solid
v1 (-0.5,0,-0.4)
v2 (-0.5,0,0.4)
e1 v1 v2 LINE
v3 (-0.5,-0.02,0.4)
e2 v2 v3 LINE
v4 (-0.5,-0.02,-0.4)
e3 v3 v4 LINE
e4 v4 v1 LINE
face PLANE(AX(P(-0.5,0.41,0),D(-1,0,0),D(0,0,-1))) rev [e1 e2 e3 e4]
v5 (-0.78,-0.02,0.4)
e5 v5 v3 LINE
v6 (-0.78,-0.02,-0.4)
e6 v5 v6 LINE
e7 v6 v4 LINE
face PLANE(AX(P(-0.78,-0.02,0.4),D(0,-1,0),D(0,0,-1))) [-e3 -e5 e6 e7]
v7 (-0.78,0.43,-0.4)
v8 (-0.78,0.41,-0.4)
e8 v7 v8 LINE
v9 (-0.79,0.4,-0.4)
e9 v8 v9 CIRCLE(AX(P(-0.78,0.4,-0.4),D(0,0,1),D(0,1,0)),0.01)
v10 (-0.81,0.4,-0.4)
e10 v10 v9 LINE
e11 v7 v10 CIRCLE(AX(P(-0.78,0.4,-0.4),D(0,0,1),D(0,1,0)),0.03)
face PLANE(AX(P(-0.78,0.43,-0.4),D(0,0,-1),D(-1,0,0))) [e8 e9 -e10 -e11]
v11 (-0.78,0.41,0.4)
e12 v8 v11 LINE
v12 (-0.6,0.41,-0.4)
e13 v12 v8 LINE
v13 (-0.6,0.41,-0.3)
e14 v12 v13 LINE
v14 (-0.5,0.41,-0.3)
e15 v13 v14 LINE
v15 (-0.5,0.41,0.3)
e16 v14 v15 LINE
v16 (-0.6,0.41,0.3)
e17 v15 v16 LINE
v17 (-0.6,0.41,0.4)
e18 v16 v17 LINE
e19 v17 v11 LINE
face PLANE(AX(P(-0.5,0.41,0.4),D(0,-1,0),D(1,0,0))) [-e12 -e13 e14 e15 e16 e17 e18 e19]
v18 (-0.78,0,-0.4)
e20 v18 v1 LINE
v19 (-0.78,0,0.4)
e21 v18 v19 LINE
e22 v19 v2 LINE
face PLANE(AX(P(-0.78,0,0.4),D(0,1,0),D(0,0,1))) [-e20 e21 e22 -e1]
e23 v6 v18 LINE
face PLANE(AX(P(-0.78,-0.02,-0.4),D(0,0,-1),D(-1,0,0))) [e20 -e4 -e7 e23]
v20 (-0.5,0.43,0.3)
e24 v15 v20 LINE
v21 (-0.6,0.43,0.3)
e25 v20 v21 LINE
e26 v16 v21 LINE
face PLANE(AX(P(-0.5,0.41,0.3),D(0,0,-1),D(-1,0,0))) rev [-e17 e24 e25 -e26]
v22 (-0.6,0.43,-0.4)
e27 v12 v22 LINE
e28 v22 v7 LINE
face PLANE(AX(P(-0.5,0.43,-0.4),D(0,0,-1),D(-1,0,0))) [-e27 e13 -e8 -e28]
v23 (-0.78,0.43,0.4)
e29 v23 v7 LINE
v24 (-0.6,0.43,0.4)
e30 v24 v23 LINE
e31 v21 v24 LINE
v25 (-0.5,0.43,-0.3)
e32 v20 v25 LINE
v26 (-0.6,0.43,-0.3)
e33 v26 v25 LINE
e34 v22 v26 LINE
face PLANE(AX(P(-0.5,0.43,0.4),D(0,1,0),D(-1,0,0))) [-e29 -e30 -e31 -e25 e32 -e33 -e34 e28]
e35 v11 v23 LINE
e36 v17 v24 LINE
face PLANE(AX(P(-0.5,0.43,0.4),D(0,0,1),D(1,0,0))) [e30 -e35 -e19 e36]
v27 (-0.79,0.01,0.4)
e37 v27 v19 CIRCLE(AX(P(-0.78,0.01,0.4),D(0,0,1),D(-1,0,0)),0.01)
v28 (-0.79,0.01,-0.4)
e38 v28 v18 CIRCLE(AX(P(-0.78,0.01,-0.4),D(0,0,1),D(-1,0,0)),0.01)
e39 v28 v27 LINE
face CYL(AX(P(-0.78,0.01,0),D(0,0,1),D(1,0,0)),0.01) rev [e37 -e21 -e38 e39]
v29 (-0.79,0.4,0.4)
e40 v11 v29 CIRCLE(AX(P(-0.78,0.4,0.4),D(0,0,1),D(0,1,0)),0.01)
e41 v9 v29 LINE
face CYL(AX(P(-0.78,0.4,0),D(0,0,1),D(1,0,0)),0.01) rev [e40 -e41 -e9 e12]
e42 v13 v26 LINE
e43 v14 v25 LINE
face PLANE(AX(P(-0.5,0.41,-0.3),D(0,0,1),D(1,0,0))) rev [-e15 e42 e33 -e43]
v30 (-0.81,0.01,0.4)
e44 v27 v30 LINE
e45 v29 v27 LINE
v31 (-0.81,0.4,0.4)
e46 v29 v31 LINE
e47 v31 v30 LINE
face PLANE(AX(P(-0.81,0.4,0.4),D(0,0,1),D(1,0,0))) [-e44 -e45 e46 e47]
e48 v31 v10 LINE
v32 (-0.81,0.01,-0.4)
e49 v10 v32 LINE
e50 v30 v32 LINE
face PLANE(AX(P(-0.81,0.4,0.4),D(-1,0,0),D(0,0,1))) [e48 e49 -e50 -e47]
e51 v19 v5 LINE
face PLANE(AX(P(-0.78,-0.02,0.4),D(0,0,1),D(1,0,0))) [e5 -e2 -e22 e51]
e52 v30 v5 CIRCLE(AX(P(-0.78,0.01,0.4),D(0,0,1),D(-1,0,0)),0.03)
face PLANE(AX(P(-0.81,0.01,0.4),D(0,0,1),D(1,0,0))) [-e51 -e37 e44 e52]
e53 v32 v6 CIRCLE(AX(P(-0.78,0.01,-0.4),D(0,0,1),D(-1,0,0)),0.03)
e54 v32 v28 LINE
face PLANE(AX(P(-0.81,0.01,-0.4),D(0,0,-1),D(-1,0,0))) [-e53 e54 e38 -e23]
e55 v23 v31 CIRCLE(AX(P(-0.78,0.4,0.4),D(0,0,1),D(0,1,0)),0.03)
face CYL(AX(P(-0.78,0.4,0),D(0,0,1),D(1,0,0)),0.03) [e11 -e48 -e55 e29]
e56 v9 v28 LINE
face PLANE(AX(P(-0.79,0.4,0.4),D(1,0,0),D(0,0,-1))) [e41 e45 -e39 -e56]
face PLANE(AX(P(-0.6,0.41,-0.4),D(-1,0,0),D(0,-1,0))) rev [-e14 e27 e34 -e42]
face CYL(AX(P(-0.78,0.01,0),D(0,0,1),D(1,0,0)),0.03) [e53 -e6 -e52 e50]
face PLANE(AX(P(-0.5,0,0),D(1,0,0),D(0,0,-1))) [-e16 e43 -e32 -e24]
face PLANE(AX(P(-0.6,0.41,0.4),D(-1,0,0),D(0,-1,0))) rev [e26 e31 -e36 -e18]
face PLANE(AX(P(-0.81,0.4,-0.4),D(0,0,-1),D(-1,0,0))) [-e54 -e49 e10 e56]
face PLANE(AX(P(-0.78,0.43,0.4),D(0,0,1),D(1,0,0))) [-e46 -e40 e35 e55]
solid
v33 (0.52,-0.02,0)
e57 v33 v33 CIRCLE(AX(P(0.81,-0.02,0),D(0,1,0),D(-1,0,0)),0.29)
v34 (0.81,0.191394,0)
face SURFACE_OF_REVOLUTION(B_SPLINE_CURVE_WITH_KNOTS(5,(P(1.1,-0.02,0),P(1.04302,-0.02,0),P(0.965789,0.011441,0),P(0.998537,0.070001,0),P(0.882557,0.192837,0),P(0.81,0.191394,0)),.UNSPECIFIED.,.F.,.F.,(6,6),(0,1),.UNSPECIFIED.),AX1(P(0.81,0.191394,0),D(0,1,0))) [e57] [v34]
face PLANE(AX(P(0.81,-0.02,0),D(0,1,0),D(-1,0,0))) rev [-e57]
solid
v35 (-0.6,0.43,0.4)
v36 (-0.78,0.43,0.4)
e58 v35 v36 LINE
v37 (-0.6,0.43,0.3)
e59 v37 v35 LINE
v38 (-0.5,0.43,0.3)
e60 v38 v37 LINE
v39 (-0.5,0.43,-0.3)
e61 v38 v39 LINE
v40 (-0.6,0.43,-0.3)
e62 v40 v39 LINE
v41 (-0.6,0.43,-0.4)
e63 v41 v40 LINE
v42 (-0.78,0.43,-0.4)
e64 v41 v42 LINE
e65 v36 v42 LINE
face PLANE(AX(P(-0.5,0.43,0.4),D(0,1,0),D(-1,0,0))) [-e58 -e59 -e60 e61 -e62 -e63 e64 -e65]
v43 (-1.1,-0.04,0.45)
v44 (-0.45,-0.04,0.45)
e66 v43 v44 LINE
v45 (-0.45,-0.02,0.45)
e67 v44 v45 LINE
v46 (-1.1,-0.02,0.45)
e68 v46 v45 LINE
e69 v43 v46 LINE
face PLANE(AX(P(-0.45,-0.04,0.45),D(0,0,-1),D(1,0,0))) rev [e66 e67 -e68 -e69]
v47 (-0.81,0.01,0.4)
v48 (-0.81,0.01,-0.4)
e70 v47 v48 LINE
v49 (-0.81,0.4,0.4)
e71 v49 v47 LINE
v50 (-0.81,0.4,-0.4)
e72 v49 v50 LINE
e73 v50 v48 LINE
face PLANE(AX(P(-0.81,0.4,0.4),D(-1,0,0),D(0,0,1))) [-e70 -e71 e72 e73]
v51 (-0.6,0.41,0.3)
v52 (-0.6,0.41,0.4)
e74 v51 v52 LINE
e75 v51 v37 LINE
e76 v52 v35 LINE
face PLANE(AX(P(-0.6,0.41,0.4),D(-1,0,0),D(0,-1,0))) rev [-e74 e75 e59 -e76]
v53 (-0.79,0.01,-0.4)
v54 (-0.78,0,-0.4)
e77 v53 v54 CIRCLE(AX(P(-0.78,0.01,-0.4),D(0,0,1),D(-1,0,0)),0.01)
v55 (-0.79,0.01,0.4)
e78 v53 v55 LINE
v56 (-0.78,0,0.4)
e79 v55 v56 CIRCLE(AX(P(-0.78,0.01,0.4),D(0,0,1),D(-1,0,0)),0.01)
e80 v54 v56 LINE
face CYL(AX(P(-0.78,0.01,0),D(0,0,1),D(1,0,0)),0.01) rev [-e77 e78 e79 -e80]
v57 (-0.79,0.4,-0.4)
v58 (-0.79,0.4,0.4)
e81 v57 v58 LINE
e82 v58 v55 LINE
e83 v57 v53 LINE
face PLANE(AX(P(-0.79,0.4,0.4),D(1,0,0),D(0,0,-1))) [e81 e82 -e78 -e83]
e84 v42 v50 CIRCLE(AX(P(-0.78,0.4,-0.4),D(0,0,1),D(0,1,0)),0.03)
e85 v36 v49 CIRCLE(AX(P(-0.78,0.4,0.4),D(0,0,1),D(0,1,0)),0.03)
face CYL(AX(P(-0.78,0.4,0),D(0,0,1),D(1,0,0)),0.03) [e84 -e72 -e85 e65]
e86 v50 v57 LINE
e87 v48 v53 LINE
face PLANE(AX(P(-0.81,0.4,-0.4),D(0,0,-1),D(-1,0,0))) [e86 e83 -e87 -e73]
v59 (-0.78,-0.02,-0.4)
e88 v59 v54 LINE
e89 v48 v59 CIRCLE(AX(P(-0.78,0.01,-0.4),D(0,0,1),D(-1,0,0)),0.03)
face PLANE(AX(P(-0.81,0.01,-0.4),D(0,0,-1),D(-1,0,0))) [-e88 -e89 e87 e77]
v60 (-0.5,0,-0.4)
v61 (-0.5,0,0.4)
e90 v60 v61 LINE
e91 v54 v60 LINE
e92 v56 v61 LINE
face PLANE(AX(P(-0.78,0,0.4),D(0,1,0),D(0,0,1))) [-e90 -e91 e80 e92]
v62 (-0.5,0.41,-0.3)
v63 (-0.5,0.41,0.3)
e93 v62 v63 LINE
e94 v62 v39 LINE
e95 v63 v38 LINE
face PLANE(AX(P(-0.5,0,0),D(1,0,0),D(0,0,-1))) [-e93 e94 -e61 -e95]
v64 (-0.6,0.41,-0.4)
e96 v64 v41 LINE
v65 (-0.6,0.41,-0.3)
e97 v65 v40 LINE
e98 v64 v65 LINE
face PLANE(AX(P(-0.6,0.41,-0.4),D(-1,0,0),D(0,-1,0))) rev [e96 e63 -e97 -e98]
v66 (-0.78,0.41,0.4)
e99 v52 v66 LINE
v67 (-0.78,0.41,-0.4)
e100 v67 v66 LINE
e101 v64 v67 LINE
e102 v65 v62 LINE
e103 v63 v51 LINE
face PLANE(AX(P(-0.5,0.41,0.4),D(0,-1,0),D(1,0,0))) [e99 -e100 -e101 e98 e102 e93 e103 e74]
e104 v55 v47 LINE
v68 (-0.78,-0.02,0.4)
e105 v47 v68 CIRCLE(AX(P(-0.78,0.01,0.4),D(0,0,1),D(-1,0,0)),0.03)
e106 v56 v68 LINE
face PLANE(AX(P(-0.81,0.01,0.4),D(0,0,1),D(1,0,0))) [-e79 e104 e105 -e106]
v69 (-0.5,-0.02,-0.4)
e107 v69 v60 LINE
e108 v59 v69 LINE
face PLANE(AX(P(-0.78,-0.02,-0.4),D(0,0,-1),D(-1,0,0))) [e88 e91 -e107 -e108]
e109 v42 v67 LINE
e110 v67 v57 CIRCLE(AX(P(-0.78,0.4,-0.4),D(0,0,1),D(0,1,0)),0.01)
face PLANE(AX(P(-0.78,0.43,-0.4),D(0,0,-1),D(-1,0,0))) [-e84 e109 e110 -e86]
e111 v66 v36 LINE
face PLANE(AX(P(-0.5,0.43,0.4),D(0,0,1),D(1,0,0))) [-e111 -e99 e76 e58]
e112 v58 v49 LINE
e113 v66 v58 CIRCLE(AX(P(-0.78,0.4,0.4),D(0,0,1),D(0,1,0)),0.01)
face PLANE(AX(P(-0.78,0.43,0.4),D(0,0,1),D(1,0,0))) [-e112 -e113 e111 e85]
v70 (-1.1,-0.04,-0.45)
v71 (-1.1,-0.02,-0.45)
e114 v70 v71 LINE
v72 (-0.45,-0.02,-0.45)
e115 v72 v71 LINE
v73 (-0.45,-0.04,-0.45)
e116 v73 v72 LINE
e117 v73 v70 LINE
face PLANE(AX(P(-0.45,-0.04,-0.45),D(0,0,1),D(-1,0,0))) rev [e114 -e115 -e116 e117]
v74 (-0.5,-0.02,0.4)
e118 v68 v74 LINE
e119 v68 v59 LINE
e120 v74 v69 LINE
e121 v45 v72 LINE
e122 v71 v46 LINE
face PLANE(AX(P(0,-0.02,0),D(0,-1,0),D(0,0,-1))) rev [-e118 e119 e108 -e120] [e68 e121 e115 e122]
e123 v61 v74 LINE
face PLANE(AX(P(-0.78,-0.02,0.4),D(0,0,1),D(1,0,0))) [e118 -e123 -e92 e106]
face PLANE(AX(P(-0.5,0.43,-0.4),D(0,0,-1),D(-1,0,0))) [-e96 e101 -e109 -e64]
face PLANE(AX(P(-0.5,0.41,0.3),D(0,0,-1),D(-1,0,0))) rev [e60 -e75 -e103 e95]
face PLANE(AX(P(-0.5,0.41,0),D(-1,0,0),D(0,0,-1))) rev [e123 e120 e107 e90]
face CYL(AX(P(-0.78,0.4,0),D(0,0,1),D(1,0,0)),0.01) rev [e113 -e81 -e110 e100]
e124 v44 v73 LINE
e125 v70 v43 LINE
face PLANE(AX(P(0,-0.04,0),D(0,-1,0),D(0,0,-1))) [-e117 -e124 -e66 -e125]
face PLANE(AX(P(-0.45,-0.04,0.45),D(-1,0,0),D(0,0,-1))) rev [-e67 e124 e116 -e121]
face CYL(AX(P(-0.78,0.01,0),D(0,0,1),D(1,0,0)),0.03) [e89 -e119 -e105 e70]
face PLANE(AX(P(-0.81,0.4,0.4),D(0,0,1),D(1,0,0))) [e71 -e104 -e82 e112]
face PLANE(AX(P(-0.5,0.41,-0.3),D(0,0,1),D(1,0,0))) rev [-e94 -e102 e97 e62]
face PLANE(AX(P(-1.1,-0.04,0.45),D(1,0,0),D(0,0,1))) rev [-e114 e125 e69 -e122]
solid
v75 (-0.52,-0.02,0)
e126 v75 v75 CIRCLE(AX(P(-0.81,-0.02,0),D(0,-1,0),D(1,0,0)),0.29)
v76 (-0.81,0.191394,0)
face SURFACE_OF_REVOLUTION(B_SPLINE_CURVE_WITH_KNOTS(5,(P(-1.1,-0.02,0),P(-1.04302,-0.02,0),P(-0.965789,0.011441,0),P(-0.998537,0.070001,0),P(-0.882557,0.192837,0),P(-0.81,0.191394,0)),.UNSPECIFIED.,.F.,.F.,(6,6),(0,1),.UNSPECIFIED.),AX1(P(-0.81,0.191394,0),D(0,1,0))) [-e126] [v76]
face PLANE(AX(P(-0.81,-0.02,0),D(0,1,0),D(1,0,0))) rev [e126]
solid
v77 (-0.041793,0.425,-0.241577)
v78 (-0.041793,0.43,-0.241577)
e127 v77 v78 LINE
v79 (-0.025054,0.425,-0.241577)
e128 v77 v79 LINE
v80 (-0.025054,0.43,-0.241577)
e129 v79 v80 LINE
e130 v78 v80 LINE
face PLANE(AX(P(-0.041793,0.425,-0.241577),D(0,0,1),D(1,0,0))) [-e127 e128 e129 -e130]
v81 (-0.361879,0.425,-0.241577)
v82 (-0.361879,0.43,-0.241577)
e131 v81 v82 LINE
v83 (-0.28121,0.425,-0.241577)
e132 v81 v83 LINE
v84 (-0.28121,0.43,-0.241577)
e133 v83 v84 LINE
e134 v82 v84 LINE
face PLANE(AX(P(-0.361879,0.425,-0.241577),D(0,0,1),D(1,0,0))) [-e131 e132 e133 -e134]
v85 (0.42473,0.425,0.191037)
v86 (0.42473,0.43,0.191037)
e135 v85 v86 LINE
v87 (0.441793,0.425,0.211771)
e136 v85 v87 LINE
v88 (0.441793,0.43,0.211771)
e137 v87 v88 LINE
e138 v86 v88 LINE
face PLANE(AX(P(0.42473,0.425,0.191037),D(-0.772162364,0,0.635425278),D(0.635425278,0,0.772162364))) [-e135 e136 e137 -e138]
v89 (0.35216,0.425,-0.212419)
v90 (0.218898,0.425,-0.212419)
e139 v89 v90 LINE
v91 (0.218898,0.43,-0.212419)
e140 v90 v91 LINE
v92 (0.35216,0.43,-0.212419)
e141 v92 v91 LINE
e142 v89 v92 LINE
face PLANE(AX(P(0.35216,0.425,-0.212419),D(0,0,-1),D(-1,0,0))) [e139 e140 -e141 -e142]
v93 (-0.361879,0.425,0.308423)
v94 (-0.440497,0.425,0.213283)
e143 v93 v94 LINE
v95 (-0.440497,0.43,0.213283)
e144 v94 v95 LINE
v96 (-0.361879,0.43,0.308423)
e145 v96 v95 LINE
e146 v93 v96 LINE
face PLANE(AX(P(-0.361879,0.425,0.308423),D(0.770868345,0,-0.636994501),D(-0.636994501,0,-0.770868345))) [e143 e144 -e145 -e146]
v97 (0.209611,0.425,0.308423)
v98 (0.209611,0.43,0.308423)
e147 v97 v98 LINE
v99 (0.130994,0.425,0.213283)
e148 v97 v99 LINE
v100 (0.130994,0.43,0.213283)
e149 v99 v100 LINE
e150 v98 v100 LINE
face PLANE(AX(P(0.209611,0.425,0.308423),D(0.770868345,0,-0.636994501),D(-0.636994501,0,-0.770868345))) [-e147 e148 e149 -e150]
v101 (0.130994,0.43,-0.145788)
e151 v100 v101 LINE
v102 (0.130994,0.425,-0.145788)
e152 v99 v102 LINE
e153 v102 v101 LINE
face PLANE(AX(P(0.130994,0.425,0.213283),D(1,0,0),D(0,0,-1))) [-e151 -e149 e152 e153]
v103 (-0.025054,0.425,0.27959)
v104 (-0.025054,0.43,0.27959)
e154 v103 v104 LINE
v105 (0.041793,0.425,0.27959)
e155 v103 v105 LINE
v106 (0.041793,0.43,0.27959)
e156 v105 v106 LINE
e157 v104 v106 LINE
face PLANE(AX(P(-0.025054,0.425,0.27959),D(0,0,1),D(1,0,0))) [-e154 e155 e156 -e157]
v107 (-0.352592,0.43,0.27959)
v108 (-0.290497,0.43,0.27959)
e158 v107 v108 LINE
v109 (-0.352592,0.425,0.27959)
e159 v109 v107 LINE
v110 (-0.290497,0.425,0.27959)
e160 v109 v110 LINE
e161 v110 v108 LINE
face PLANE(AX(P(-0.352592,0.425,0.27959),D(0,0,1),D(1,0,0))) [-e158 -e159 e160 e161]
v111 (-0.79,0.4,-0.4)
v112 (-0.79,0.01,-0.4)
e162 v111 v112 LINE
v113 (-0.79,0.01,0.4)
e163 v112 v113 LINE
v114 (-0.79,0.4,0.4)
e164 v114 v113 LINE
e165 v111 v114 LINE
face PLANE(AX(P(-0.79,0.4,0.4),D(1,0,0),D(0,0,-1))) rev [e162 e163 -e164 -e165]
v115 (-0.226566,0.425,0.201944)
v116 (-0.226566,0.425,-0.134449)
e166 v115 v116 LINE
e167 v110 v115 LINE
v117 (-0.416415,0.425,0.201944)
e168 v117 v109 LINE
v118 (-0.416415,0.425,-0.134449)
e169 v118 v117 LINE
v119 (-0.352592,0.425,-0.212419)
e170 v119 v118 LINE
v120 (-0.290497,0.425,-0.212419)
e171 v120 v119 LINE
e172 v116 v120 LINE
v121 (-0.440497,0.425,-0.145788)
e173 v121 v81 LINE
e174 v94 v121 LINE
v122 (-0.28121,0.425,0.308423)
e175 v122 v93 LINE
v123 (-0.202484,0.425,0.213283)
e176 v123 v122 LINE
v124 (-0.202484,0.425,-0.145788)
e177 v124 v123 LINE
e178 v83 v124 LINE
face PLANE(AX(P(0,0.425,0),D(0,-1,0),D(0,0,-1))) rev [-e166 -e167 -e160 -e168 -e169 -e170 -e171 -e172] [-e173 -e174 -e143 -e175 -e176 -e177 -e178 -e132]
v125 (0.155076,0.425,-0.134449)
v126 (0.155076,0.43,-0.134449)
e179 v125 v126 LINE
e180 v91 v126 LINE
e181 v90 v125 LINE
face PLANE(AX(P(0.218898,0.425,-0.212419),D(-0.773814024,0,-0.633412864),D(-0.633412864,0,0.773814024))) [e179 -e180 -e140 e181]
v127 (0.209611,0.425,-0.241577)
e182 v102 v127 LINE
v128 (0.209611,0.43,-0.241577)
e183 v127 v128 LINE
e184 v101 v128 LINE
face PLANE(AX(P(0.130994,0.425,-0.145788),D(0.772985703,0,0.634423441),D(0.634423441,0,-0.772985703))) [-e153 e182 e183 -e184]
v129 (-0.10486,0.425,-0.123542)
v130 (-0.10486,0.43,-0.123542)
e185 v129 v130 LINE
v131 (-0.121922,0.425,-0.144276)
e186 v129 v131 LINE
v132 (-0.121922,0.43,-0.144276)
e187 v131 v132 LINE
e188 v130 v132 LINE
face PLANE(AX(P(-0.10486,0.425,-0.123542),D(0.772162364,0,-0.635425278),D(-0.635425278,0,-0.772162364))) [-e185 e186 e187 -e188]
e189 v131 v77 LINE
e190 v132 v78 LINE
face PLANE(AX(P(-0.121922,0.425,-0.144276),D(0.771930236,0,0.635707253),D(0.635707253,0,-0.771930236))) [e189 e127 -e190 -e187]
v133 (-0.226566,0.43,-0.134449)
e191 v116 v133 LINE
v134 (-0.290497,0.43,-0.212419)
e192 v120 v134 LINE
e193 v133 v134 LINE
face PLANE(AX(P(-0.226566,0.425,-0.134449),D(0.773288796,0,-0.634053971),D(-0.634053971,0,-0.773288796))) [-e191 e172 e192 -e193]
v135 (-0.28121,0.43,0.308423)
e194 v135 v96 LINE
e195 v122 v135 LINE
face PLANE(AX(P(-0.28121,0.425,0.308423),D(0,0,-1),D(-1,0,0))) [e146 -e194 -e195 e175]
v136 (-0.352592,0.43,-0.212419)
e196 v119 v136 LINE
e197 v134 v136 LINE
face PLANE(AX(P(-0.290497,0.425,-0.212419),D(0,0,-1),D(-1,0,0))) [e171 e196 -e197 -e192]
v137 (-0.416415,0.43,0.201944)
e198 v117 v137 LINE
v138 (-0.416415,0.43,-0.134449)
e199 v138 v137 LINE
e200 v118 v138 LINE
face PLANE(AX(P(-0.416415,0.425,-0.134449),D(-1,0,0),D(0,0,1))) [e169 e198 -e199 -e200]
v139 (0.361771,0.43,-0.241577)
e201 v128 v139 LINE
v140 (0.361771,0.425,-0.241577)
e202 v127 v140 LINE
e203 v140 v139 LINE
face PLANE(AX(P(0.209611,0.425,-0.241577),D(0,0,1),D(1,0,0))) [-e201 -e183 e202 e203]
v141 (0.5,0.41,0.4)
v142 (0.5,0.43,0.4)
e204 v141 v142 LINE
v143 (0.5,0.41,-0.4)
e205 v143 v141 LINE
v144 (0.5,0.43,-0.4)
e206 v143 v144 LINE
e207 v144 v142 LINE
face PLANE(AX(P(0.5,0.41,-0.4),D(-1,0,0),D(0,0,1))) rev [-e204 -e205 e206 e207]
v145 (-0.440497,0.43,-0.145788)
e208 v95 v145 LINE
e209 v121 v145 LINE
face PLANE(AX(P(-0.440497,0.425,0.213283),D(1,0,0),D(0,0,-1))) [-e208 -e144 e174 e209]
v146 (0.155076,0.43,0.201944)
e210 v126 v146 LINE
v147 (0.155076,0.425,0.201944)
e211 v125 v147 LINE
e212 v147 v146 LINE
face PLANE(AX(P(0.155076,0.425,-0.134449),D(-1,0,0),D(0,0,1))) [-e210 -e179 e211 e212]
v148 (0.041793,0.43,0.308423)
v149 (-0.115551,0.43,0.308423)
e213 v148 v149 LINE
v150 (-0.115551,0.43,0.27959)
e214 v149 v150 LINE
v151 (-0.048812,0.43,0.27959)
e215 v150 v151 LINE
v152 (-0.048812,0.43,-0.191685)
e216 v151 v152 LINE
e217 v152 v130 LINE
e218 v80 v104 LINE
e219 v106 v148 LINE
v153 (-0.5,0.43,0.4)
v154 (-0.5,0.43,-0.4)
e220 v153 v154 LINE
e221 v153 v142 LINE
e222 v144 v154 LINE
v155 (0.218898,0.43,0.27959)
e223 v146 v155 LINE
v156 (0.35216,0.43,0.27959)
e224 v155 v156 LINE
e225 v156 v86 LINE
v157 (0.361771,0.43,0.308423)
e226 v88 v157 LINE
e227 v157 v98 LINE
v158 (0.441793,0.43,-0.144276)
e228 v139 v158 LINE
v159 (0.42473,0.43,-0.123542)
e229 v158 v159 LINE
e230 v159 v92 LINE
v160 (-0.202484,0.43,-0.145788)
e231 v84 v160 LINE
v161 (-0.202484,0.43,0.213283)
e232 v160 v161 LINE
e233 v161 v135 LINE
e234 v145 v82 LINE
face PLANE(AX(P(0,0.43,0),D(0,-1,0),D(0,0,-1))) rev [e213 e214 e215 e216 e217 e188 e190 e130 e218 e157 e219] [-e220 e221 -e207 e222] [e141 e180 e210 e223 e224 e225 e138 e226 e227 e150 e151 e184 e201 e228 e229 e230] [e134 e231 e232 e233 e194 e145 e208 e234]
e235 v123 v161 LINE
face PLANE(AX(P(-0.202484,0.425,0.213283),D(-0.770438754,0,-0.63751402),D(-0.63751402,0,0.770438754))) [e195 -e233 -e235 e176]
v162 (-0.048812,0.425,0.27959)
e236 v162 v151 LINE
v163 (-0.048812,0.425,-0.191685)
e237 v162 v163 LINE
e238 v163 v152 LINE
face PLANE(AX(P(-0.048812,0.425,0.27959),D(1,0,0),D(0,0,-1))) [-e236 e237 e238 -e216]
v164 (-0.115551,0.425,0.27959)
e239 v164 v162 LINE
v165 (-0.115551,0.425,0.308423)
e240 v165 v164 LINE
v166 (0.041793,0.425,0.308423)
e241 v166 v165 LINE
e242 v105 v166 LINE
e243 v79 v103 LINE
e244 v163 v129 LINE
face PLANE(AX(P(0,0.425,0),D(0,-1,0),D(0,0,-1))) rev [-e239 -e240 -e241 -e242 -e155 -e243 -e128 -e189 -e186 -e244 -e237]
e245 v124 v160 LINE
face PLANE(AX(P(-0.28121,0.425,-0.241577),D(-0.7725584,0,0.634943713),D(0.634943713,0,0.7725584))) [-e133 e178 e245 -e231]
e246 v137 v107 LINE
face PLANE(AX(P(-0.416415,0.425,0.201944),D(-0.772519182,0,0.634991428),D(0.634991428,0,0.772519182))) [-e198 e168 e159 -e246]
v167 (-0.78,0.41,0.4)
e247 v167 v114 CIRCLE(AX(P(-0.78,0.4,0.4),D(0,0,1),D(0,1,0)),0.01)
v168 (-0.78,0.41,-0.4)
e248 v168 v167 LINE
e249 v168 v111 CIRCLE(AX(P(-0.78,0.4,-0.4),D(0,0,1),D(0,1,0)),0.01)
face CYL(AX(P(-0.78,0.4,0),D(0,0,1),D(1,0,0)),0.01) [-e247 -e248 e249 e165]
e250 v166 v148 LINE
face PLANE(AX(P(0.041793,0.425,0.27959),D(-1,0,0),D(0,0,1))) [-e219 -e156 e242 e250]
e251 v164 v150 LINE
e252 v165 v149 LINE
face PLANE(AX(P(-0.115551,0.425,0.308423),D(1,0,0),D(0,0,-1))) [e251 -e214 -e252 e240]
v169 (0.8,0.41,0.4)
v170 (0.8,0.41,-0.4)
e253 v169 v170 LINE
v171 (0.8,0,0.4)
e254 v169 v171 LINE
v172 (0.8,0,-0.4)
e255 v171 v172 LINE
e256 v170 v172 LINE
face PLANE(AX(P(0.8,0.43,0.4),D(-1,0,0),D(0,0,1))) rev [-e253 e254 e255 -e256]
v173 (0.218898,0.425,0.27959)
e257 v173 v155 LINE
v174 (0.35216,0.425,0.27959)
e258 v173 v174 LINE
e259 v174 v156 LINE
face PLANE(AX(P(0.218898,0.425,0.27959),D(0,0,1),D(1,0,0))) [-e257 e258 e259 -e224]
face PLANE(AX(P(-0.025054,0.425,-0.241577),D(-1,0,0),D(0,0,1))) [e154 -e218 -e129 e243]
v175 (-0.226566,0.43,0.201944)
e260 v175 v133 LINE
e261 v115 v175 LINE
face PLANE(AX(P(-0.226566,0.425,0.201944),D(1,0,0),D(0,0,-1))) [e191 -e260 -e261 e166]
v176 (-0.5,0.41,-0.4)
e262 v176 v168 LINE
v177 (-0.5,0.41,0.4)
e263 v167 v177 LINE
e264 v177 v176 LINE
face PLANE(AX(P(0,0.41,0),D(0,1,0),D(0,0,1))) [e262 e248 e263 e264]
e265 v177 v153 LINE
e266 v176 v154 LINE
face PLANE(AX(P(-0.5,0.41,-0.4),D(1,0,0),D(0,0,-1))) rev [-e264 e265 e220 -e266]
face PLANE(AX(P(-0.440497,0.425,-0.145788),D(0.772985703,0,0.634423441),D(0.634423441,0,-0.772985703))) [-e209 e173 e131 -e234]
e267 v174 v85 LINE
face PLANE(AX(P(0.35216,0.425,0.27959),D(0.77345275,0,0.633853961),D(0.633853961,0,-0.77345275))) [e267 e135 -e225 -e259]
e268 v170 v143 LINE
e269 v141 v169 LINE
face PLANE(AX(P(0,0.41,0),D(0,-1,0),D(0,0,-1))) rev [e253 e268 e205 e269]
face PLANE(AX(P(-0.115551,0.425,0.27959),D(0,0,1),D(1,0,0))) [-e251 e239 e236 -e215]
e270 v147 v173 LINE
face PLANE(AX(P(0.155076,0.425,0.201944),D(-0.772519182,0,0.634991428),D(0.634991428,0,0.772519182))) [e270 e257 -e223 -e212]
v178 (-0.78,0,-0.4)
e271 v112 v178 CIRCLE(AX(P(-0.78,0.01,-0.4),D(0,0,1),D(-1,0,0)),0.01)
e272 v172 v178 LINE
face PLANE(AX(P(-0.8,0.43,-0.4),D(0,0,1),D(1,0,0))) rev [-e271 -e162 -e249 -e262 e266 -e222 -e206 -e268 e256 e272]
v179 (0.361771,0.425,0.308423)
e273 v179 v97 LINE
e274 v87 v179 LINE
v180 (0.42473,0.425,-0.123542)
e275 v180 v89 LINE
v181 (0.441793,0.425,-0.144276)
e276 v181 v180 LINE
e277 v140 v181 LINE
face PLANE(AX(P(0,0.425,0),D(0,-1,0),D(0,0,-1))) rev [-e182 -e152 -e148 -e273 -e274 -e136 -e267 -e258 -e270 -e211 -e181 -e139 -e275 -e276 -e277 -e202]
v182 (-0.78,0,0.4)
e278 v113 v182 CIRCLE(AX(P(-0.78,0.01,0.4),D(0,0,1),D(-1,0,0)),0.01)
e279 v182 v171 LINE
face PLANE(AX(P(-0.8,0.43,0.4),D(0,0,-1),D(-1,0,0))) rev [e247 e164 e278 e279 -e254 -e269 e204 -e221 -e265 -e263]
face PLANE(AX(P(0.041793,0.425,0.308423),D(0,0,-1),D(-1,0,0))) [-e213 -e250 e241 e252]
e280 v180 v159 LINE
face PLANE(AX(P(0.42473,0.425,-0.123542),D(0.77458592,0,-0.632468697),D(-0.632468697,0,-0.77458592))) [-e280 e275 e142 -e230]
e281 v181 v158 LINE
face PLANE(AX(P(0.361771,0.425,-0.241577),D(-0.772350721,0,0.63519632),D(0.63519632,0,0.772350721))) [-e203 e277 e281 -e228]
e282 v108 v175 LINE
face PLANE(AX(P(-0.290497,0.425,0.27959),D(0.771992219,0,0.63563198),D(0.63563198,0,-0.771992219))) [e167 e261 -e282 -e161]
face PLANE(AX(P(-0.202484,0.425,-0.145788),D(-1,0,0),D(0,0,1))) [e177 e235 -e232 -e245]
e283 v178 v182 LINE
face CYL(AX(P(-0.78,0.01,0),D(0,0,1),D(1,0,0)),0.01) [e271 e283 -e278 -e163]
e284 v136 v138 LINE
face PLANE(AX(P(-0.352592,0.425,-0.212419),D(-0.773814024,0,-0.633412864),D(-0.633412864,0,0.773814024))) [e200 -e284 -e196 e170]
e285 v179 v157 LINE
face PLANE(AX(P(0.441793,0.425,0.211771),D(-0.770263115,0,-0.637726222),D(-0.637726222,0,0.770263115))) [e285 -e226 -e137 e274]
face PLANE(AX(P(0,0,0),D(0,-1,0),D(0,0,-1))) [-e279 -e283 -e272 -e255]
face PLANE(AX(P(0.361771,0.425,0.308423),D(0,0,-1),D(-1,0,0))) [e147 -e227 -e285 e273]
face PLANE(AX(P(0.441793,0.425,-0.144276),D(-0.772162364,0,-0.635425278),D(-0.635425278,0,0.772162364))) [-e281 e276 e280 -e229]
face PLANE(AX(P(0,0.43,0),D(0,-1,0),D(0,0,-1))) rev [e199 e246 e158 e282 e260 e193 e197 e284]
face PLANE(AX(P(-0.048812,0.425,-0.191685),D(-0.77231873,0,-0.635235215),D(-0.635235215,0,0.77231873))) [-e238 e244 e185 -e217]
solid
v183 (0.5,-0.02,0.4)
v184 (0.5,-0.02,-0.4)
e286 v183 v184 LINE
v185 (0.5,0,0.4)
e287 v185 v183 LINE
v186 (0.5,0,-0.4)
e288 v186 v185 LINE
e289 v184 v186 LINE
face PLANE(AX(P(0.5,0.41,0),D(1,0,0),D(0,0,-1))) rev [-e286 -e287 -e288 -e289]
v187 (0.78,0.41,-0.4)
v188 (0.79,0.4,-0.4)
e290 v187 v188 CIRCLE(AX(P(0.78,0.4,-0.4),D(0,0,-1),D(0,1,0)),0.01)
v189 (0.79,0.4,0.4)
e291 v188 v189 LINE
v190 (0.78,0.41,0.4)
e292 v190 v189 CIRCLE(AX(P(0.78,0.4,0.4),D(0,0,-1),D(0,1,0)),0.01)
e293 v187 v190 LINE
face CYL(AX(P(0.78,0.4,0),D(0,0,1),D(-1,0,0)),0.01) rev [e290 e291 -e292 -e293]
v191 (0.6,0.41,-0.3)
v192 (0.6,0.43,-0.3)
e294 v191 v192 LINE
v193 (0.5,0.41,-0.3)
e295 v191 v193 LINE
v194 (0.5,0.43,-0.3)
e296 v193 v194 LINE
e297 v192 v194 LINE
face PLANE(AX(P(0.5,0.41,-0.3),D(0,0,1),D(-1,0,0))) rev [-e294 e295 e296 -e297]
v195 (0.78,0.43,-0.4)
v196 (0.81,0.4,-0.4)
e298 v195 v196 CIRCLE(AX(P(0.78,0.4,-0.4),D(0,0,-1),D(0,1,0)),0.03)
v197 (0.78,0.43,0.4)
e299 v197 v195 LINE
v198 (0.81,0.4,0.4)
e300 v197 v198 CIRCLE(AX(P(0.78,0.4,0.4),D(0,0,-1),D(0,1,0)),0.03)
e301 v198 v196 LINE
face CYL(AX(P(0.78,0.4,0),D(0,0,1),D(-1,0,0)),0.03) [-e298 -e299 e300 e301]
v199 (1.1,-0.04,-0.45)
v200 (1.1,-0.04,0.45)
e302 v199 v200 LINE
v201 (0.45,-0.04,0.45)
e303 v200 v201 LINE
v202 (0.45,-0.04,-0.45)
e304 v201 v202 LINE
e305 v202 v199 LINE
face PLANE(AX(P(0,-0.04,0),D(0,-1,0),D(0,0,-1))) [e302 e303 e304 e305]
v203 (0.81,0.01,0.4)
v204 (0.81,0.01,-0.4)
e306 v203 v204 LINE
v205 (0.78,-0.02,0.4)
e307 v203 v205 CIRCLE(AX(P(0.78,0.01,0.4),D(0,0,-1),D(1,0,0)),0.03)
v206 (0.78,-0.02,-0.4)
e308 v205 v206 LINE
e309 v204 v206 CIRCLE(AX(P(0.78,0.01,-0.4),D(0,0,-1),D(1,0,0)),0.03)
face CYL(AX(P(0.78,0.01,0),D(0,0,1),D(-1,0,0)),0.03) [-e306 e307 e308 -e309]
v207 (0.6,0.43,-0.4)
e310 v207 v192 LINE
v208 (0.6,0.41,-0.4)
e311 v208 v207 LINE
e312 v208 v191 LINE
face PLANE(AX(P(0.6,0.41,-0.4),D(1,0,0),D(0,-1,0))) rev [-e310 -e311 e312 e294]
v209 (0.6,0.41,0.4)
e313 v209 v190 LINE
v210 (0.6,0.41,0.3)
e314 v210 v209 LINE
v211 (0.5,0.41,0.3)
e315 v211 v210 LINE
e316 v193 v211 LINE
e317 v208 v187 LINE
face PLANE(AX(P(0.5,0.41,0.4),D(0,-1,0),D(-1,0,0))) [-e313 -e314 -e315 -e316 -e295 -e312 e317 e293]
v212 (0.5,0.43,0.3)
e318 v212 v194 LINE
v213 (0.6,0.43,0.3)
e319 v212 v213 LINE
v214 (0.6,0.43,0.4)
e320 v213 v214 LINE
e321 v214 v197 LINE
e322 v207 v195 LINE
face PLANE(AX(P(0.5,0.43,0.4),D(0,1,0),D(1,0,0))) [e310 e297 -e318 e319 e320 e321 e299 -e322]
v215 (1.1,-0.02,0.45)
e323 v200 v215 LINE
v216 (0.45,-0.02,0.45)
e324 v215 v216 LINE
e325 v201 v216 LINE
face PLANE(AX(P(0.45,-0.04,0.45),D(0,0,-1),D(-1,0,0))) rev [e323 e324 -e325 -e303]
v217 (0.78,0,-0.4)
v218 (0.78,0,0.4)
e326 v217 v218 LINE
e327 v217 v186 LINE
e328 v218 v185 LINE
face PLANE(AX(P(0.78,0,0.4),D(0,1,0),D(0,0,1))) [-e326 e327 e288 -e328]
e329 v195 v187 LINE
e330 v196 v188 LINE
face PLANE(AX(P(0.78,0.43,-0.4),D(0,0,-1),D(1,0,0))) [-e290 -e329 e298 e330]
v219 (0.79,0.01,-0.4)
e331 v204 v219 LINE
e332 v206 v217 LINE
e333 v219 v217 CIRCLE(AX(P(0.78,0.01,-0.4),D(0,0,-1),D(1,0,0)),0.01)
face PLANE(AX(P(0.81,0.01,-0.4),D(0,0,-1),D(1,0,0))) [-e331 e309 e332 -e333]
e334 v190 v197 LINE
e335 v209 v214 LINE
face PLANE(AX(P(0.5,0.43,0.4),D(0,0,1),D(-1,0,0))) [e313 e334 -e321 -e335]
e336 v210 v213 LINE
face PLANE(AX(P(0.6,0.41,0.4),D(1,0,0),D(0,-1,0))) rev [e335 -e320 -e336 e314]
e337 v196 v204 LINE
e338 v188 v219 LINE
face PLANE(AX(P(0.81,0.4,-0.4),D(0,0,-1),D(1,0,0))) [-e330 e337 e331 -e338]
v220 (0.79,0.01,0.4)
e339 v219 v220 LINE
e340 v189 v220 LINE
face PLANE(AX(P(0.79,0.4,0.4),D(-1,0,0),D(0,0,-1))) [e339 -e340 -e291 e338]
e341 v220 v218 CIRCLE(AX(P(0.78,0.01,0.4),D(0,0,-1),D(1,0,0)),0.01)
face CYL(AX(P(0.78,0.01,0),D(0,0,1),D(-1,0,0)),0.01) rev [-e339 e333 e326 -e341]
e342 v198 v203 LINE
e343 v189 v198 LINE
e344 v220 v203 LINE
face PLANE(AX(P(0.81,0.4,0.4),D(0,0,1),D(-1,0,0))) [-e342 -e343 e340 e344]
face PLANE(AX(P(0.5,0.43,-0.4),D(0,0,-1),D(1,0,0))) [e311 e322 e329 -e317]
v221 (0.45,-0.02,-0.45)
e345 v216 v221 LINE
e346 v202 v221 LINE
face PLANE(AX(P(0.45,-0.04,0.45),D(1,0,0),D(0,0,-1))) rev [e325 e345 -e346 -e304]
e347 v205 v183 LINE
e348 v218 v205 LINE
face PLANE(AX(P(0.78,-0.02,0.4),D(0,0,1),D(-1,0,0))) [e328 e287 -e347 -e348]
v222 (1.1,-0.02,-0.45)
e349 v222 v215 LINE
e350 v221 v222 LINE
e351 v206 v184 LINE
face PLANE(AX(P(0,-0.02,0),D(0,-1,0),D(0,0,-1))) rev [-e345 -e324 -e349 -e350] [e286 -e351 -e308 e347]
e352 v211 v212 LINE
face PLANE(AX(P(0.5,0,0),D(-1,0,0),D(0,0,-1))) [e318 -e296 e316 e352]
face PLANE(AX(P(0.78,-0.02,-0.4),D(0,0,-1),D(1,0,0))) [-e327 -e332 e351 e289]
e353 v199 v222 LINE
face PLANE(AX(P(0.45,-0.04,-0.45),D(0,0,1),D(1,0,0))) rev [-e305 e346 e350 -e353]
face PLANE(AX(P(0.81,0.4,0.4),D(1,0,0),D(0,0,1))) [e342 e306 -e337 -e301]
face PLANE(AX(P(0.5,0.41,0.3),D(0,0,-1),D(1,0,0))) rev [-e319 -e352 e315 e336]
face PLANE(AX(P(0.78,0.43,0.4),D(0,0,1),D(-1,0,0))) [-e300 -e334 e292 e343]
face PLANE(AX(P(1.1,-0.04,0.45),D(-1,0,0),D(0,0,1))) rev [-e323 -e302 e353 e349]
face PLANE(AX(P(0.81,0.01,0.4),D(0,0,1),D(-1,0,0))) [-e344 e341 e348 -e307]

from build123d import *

# Parameters (mm, degrees)
CROQUIS1_W              = 1.6
CROQUIS1_H              = 0.8
SALIENTE_EXTRUIR1_DEPTH = 0.43
CROQUIS5_W              = 0.3
CROQUIS5_H              = 0.8
CORTAR_EXTRUIR1_DEPTH   = 0.02
CROQUIS2_W              = 0.8
CROQUIS2_H              = 0.02
CROQUIS2_2_W            = 0.8
CROQUIS2_2_H            = 0.02
CROQUIS6_W              = 0.1
CROQUIS6_H              = 0.1
CORTAR_EXTRUIR2_DEPTH   = 0.02
CROQUIS7_W              = 0.3
CROQUIS7_H              = 0.8
CORTAR_EXTRUIR3_DEPTH   = 0.02
CORTAR_EXTRUIR4_DEPTH   = 0.005
CROQUIS10_W             = 0.65
CROQUIS10_H             = 0.9
SALIENTE_EXTRUIR2_DEPTH = 0.02


# Read off the part's stored shape, not the designer's step: Revolución1
with BuildPart() as part:
    # Croquis1 → Saliente-Extruir1 (new body)
    with BuildSketch(Plane(origin=(0, 0, 0), x_dir=(1, 0, 0), z_dir=(0, 1, 0))):
        Rectangle(CROQUIS1_W, CROQUIS1_H)
    extrude(amount=SALIENTE_EXTRUIR1_DEPTH)

    # Croquis5 → Cortar-Extruir1 (cut)
    with BuildSketch(Plane(origin=(0, 0.43, 0), x_dir=(1, 0, 0), z_dir=(0, 1, 0))):
        with Locations((-0.65, 0)):
            Rectangle(CROQUIS5_W, CROQUIS5_H)
    extrude(amount=-CORTAR_EXTRUIR1_DEPTH, mode=Mode.SUBTRACT)

    # Cortar-Barrer2: sweep along a path in Croquis3
    with BuildLine(Plane.XY) as cortar_barrer2_path:
        Line((-0.5, 0.42), (-0.78, 0.42))
        ThreePointArc((-0.78, 0.42), (-0.794142136, 0.414142136), (-0.8, 0.4))
        Line((-0.8, 0.4), (-0.8, 0.01))
        ThreePointArc((-0.8, 0.01), (-0.794142136, -0.004142136), (-0.78, -0.01))
        Line((-0.78, -0.01), (-0.5, -0.01))
    # Croquis2 → Cortar-Barrer2 (sweep, cut)
    with BuildSketch(Plane.ZY.offset(0.5)):
        with Locations((0, 0.42)):
            Rectangle(CROQUIS2_W, CROQUIS2_H)
    sweep(path=cortar_barrer2_path.line, mode=Mode.SUBTRACT)

    # Croquis7 → Cortar-Extruir3 (cut)
    with BuildSketch(Plane(origin=(0, 0.43, 0), x_dir=(1, 0, 0), z_dir=(0, 1, 0))):
        with Locations((0.65, 0)):
            Rectangle(CROQUIS7_W, CROQUIS7_H)
    extrude(amount=-CORTAR_EXTRUIR3_DEPTH, mode=Mode.SUBTRACT)

    # Croquis8 → Cortar-Extruir4 (cut)
    # profile 1 of 3: a face of its own
    with BuildSketch(Plane(origin=(0, 0.43, 0), x_dir=(1, 0, 0), z_dir=(0, 1, 0))):
        Polygon((-0.202483801, -0.213282937), (-0.281209503, -0.308423326), (-0.36187905, -0.308423326), (-0.44049676, -0.213282937), (-0.44049676, 0.145788337), (-0.36187905, 0.241576674), (-0.281209503, 0.241576674), (-0.202483801, 0.145788337), align=None)
        Polygon((-0.226565875, -0.201943844), (-0.226565875, 0.134449244), (-0.29049676, 0.212419006), (-0.352591793, 0.212419006), (-0.416414687, 0.134449244), (-0.416414687, -0.201943844), (-0.352591793, -0.279589633), (-0.29049676, -0.279589633), align=None, mode=Mode.SUBTRACT)
    # profile 2 of 3: a face of its own
    with BuildSketch(Plane(origin=(0, 0.43, 0), x_dir=(1, 0, 0), z_dir=(0, 1, 0))):
        Polygon((0.041792657, -0.308423326), (-0.115550756, -0.308423326), (-0.115550756, -0.279589633), (-0.048812095, -0.279589633), (-0.048812095, 0.191684665), (-0.104859611, 0.123542117), (-0.121922246, 0.144276458), (-0.041792657, 0.241576674), (-0.025053996, 0.241576674), (-0.025053996, -0.279589633), (0.041792657, -0.279589633), align=None)
    # profile 3 of 3: a face of its own
    with BuildSketch(Plane(origin=(0, 0.43, 0), x_dir=(1, 0, 0), z_dir=(0, 1, 0))):
        Polygon((0.441792657, -0.211771058), (0.361771058, -0.308423326), (0.209611231, -0.308423326), (0.130993521, -0.213282937), (0.130993521, 0.145788337), (0.209611231, 0.241576674), (0.361771058, 0.241576674), (0.441792657, 0.144276458), (0.424730022, 0.123542117), (0.352159827, 0.212419006), (0.218898488, 0.212419006), (0.155075594, 0.134449244), (0.155075594, -0.201943844), (0.218898488, -0.279589633), (0.352159827, -0.279589633), (0.424730022, -0.191036717), align=None)
    extrude(amount=-CORTAR_EXTRUIR4_DEPTH, mode=Mode.SUBTRACT)


with BuildPart() as body_2:
    # Barrer1: sweep along a path in Croquis3<2>
    with BuildLine(Plane.XY) as barrer1_path:
        Line((-0.5, 0.42), (-0.78, 0.42))
        ThreePointArc((-0.78, 0.42), (-0.794142136, 0.414142136), (-0.8, 0.4))
        Line((-0.8, 0.4), (-0.8, 0.01))
        ThreePointArc((-0.8, 0.01), (-0.794142136, -0.004142136), (-0.78, -0.01))
        Line((-0.78, -0.01), (-0.5, -0.01))
    # Croquis2<2> → Barrer1 (sweep)
    with BuildSketch(Plane.ZY.offset(0.5)):
        with Locations((0, 0.42)):
            Rectangle(CROQUIS2_2_W, CROQUIS2_2_H)
    sweep(path=barrer1_path.line)

    # Croquis6 → Cortar-Extruir2 (cut)
    with BuildSketch(Plane(origin=(0, 0.43, 0), x_dir=(1, 0, 0), z_dir=(0, 1, 0))):
        with Locations((-0.55, -0.35)):
            Rectangle(CROQUIS6_W, CROQUIS6_H)
        with Locations((-0.55, 0.35)):
            Rectangle(CROQUIS6_W, CROQUIS6_H)
    extrude(amount=-CORTAR_EXTRUIR2_DEPTH, mode=Mode.SUBTRACT)


with BuildPart() as body_3:
    # Simetría4: mirrored copy
    add(body_2.part.mirror(Plane(origin=(0, 0, 0), x_dir=(0, 0, 1), z_dir=(1, 0, 0))))

    # Croquis10 → Saliente-Extruir2 (add)
    with BuildSketch(Plane.XZ.offset(0.02)):
        with Locations((0.775, 0)):
            Rectangle(CROQUIS10_W, CROQUIS10_H)
    extrude(amount=SALIENTE_EXTRUIR2_DEPTH)


with BuildPart() as body_4:
    # Revolución1 outline → Revolución1 (revolve)
    with BuildSketch(Plane(origin=(0.81, 0, 0), x_dir=(1, 0, 0), z_dir=(0, 0, 1))):
        with BuildLine():
            Line((0, -0.02), (0.29, -0.02))
            add(Edge.make_bspline(
                [(0.29, -0.02), (0.233020144, -0.02), (0.155789366, 0.011440674), (0.188536625, 0.070000696), (0.072556751, 0.192836807), (0, 0.191393605)],
                knots=[0, 0, 0, 0, 0, 0, 1, 1, 1, 1, 1, 1], degree=5))
            Line((0, 0.191393605), (0, -0.02))
        make_face()
    revolve(axis=Axis((0.81, 0, 0), (0, 1, 0)))


with BuildPart() as body_5:
    # Simetría5: mirrored copy
    add(body_4.part.mirror(Plane(origin=(0, 0, 0), x_dir=(0, 0, 1), z_dir=(1, 0, 0))))


with BuildPart() as body_6:
    # Simetr_a5 2: mirrored copy
    add(body_3.part.mirror(Plane(origin=(0, 0, 0), x_dir=(0, 0, 1), z_dir=(1, 0, 0))))


solid = Compound([part.part, body_2.part, body_3.part, body_4.part, body_5.part, body_6.part])
